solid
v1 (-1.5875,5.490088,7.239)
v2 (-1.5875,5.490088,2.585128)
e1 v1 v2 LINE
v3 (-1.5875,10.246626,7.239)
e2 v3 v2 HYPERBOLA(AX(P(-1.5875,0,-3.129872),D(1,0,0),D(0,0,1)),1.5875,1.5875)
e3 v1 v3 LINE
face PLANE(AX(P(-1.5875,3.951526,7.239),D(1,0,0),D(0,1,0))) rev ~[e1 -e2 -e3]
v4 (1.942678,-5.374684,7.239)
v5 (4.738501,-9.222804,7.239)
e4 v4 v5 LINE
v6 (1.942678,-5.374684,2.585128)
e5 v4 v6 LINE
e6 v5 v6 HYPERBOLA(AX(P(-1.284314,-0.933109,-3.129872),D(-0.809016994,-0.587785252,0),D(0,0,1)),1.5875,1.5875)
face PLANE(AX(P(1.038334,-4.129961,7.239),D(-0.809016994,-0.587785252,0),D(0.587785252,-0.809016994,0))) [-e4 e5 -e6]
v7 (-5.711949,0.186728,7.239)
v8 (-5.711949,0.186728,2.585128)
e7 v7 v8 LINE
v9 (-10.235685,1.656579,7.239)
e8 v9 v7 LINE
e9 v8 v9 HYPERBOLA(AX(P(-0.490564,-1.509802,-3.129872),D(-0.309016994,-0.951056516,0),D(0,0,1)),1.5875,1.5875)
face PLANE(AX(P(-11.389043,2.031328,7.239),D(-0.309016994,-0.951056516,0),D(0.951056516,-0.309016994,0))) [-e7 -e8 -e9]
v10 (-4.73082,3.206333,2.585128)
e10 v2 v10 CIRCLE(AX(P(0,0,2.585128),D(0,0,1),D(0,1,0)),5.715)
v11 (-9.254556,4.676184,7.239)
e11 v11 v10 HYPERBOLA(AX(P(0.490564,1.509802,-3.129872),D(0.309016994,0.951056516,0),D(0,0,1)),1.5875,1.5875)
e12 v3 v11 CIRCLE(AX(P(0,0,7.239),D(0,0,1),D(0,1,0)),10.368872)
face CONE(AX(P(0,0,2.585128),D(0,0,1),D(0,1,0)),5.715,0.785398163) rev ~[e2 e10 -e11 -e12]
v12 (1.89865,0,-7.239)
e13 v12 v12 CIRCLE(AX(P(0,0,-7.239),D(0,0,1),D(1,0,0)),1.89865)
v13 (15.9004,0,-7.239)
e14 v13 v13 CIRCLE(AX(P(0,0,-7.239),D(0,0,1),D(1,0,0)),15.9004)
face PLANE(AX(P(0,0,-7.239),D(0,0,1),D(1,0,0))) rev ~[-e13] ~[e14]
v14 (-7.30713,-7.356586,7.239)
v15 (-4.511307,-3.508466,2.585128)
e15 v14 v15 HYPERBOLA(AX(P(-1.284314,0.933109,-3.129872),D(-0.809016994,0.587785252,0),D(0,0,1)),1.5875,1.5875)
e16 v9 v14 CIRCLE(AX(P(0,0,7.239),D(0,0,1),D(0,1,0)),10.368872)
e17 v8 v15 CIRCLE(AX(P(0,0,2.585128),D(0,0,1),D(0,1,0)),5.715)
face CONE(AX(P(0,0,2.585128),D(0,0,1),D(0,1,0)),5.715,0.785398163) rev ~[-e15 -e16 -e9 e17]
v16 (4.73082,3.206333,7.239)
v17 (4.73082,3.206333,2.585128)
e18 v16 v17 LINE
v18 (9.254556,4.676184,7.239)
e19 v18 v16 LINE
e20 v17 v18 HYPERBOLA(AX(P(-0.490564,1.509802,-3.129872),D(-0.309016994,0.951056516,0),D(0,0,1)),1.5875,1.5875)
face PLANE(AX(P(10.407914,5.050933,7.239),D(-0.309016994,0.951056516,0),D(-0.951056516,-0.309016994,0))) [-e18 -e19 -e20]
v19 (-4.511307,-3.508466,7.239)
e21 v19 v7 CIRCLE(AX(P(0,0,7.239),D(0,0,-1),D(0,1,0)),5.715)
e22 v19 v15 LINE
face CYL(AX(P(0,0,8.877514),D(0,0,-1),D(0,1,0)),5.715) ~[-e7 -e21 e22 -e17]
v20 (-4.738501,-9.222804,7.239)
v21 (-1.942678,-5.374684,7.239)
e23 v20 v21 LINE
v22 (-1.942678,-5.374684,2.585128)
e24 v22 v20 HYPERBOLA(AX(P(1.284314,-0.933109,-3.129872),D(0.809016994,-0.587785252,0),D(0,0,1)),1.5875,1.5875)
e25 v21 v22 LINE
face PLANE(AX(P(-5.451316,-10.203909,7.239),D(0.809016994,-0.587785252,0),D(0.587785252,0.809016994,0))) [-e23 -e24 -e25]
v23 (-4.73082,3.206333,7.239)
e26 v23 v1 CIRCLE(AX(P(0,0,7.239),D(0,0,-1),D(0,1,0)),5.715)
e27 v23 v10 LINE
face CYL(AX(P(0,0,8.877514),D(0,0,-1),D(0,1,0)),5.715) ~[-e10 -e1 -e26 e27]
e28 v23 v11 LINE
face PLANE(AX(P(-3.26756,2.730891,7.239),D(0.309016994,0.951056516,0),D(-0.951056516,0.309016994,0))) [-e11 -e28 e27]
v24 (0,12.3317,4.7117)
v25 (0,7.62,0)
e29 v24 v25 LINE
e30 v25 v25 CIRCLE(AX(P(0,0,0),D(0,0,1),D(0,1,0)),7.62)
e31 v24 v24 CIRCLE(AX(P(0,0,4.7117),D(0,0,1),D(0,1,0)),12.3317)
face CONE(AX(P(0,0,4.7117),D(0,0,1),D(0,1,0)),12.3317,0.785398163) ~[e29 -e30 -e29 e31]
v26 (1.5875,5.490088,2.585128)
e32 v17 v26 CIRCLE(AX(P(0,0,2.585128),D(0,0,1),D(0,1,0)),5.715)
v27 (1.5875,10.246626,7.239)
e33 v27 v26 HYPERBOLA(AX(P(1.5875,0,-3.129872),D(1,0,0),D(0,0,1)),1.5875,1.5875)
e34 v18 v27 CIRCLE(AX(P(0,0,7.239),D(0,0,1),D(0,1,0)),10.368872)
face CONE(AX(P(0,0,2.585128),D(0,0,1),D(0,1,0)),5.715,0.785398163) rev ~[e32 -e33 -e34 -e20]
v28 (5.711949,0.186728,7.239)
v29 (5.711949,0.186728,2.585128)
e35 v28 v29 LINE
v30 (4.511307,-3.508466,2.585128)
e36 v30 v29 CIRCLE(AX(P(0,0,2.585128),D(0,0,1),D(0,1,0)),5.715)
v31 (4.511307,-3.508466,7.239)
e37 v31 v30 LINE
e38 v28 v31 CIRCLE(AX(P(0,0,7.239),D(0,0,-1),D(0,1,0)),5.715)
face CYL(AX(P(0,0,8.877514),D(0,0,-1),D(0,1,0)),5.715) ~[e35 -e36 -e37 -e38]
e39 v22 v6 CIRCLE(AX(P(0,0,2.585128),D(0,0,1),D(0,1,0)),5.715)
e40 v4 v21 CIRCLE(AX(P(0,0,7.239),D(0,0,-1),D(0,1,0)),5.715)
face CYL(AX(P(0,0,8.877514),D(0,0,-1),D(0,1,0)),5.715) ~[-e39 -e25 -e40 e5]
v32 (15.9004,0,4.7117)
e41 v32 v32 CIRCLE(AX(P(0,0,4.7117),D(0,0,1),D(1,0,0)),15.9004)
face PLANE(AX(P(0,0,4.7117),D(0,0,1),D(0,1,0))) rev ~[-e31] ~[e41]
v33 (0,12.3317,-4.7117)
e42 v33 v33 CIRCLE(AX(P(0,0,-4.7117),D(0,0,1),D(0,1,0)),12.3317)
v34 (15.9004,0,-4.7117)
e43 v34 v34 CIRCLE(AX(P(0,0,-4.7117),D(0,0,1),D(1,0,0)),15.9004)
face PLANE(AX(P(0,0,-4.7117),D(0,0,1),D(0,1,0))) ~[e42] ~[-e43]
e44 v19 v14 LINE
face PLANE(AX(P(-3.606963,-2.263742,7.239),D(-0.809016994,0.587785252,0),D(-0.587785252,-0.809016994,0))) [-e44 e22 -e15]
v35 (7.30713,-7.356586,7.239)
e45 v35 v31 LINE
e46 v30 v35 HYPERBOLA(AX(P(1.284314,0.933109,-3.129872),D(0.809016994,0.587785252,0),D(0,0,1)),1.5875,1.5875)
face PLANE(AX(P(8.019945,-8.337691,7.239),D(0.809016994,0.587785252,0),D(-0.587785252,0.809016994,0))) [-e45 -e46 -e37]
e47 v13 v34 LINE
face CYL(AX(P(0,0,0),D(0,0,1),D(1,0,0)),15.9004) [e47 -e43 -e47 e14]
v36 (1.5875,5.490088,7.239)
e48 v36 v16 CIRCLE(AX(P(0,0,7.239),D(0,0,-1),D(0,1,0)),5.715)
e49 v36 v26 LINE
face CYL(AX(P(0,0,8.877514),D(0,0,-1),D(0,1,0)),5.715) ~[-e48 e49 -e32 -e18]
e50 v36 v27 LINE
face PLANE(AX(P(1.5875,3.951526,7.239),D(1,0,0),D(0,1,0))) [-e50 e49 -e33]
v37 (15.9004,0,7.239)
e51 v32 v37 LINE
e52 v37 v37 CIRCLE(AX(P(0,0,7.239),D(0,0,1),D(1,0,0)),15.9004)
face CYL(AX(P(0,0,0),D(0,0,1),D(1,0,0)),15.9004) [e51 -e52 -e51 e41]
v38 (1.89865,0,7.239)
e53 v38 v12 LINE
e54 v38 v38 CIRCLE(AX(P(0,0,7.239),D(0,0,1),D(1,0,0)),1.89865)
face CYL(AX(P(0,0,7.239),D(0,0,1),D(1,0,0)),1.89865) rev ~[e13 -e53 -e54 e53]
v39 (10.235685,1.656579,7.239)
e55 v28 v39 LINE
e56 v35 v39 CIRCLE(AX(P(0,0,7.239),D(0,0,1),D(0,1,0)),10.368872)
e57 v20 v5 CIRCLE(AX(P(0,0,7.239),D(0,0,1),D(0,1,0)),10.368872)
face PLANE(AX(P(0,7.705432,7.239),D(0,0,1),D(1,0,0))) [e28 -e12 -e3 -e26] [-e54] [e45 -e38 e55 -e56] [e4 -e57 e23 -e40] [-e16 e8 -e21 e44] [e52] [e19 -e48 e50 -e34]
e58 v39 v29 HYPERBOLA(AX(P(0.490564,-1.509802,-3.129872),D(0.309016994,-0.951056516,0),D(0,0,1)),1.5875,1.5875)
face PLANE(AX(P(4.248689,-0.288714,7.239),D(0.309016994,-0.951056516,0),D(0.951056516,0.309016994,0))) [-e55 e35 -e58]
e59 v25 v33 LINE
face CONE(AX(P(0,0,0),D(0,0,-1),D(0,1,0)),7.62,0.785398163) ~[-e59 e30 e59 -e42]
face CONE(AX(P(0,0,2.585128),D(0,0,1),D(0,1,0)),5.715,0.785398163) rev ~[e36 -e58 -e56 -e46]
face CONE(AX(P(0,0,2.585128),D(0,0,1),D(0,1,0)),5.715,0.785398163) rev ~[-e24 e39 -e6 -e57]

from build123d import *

# Parameters (mm, degrees)
F0_R     = 15.9004
F1_DEPTH = 7.239
F2_R     = 1.89865
F3_DEPTH = 14.479
F6_W     = 3.175
F6_H     = 7.507812879


# Not quite as in the source:
# - a feature names something its author has since deleted; it is built from what else it names


with BuildPart() as f1:
    # F0 (on Top) → F1 (new body, symmetric)
    with BuildSketch(Plane.XY):
        Circle(F0_R)
    extrude(amount=F1_DEPTH, both=True)

    # F2 (on face) → F3 (cut, through all)
    with BuildSketch(Plane.XY.offset(7.239)):
        Circle(F2_R)
    extrude(amount=-F3_DEPTH, mode=Mode.SUBTRACT)

    # F4 (on Right) → F5 (revolve, cut)
    with BuildSketch(Plane.YZ):
        Polygon((18.6176884613, -4.7117), (18.6176884613, 4.7117), (12.3317, 4.7117), (7.62, 0), (12.3317, -4.7117), align=None)
        Polygon((5.715, 2.5851280605), (12.0073856063, 8.8775136668), (5.715, 8.8775136668), align=None)
    revolve(axis=Axis((0, 0, 8.1515284255), (0, 0, 1)), mode=Mode.SUBTRACT)

    # F6 (on face) → F7 (join, up to the next surface of F1)
    with BuildSketch(Plane.XY.offset(7.239)):
        with Locations((0, 7.7054322143)):
            Rectangle(F6_W, F6_H)
        Polygon((-10.4079142205, 5.0509326079), (-11.3890431777, 2.0313281687), (-4.248688816, -0.2887136015), (-3.2675598588, 2.7308908377), align=None)
        Polygon((-8.0199447403, -8.3376906272), (-5.4513157831, -10.2039088032), (-1.0383340959, -4.1299605935), (-3.606963053, -2.2637424175), align=None)
        Polygon((5.4513157831, -10.2039088032), (8.0199447403, -8.3376906272), (3.606963053, -2.2637424175), (1.0383340959, -4.1299605935), align=None)
        Polygon((11.3890431777, 2.0313281687), (10.4079142205, 5.0509326079), (3.2675598588, 2.7308908377), (4.248688816, -0.2887136015), align=None)
    extrude(until=Until.NEXT, dir=(0, 0, -1))


solid = f1.part
